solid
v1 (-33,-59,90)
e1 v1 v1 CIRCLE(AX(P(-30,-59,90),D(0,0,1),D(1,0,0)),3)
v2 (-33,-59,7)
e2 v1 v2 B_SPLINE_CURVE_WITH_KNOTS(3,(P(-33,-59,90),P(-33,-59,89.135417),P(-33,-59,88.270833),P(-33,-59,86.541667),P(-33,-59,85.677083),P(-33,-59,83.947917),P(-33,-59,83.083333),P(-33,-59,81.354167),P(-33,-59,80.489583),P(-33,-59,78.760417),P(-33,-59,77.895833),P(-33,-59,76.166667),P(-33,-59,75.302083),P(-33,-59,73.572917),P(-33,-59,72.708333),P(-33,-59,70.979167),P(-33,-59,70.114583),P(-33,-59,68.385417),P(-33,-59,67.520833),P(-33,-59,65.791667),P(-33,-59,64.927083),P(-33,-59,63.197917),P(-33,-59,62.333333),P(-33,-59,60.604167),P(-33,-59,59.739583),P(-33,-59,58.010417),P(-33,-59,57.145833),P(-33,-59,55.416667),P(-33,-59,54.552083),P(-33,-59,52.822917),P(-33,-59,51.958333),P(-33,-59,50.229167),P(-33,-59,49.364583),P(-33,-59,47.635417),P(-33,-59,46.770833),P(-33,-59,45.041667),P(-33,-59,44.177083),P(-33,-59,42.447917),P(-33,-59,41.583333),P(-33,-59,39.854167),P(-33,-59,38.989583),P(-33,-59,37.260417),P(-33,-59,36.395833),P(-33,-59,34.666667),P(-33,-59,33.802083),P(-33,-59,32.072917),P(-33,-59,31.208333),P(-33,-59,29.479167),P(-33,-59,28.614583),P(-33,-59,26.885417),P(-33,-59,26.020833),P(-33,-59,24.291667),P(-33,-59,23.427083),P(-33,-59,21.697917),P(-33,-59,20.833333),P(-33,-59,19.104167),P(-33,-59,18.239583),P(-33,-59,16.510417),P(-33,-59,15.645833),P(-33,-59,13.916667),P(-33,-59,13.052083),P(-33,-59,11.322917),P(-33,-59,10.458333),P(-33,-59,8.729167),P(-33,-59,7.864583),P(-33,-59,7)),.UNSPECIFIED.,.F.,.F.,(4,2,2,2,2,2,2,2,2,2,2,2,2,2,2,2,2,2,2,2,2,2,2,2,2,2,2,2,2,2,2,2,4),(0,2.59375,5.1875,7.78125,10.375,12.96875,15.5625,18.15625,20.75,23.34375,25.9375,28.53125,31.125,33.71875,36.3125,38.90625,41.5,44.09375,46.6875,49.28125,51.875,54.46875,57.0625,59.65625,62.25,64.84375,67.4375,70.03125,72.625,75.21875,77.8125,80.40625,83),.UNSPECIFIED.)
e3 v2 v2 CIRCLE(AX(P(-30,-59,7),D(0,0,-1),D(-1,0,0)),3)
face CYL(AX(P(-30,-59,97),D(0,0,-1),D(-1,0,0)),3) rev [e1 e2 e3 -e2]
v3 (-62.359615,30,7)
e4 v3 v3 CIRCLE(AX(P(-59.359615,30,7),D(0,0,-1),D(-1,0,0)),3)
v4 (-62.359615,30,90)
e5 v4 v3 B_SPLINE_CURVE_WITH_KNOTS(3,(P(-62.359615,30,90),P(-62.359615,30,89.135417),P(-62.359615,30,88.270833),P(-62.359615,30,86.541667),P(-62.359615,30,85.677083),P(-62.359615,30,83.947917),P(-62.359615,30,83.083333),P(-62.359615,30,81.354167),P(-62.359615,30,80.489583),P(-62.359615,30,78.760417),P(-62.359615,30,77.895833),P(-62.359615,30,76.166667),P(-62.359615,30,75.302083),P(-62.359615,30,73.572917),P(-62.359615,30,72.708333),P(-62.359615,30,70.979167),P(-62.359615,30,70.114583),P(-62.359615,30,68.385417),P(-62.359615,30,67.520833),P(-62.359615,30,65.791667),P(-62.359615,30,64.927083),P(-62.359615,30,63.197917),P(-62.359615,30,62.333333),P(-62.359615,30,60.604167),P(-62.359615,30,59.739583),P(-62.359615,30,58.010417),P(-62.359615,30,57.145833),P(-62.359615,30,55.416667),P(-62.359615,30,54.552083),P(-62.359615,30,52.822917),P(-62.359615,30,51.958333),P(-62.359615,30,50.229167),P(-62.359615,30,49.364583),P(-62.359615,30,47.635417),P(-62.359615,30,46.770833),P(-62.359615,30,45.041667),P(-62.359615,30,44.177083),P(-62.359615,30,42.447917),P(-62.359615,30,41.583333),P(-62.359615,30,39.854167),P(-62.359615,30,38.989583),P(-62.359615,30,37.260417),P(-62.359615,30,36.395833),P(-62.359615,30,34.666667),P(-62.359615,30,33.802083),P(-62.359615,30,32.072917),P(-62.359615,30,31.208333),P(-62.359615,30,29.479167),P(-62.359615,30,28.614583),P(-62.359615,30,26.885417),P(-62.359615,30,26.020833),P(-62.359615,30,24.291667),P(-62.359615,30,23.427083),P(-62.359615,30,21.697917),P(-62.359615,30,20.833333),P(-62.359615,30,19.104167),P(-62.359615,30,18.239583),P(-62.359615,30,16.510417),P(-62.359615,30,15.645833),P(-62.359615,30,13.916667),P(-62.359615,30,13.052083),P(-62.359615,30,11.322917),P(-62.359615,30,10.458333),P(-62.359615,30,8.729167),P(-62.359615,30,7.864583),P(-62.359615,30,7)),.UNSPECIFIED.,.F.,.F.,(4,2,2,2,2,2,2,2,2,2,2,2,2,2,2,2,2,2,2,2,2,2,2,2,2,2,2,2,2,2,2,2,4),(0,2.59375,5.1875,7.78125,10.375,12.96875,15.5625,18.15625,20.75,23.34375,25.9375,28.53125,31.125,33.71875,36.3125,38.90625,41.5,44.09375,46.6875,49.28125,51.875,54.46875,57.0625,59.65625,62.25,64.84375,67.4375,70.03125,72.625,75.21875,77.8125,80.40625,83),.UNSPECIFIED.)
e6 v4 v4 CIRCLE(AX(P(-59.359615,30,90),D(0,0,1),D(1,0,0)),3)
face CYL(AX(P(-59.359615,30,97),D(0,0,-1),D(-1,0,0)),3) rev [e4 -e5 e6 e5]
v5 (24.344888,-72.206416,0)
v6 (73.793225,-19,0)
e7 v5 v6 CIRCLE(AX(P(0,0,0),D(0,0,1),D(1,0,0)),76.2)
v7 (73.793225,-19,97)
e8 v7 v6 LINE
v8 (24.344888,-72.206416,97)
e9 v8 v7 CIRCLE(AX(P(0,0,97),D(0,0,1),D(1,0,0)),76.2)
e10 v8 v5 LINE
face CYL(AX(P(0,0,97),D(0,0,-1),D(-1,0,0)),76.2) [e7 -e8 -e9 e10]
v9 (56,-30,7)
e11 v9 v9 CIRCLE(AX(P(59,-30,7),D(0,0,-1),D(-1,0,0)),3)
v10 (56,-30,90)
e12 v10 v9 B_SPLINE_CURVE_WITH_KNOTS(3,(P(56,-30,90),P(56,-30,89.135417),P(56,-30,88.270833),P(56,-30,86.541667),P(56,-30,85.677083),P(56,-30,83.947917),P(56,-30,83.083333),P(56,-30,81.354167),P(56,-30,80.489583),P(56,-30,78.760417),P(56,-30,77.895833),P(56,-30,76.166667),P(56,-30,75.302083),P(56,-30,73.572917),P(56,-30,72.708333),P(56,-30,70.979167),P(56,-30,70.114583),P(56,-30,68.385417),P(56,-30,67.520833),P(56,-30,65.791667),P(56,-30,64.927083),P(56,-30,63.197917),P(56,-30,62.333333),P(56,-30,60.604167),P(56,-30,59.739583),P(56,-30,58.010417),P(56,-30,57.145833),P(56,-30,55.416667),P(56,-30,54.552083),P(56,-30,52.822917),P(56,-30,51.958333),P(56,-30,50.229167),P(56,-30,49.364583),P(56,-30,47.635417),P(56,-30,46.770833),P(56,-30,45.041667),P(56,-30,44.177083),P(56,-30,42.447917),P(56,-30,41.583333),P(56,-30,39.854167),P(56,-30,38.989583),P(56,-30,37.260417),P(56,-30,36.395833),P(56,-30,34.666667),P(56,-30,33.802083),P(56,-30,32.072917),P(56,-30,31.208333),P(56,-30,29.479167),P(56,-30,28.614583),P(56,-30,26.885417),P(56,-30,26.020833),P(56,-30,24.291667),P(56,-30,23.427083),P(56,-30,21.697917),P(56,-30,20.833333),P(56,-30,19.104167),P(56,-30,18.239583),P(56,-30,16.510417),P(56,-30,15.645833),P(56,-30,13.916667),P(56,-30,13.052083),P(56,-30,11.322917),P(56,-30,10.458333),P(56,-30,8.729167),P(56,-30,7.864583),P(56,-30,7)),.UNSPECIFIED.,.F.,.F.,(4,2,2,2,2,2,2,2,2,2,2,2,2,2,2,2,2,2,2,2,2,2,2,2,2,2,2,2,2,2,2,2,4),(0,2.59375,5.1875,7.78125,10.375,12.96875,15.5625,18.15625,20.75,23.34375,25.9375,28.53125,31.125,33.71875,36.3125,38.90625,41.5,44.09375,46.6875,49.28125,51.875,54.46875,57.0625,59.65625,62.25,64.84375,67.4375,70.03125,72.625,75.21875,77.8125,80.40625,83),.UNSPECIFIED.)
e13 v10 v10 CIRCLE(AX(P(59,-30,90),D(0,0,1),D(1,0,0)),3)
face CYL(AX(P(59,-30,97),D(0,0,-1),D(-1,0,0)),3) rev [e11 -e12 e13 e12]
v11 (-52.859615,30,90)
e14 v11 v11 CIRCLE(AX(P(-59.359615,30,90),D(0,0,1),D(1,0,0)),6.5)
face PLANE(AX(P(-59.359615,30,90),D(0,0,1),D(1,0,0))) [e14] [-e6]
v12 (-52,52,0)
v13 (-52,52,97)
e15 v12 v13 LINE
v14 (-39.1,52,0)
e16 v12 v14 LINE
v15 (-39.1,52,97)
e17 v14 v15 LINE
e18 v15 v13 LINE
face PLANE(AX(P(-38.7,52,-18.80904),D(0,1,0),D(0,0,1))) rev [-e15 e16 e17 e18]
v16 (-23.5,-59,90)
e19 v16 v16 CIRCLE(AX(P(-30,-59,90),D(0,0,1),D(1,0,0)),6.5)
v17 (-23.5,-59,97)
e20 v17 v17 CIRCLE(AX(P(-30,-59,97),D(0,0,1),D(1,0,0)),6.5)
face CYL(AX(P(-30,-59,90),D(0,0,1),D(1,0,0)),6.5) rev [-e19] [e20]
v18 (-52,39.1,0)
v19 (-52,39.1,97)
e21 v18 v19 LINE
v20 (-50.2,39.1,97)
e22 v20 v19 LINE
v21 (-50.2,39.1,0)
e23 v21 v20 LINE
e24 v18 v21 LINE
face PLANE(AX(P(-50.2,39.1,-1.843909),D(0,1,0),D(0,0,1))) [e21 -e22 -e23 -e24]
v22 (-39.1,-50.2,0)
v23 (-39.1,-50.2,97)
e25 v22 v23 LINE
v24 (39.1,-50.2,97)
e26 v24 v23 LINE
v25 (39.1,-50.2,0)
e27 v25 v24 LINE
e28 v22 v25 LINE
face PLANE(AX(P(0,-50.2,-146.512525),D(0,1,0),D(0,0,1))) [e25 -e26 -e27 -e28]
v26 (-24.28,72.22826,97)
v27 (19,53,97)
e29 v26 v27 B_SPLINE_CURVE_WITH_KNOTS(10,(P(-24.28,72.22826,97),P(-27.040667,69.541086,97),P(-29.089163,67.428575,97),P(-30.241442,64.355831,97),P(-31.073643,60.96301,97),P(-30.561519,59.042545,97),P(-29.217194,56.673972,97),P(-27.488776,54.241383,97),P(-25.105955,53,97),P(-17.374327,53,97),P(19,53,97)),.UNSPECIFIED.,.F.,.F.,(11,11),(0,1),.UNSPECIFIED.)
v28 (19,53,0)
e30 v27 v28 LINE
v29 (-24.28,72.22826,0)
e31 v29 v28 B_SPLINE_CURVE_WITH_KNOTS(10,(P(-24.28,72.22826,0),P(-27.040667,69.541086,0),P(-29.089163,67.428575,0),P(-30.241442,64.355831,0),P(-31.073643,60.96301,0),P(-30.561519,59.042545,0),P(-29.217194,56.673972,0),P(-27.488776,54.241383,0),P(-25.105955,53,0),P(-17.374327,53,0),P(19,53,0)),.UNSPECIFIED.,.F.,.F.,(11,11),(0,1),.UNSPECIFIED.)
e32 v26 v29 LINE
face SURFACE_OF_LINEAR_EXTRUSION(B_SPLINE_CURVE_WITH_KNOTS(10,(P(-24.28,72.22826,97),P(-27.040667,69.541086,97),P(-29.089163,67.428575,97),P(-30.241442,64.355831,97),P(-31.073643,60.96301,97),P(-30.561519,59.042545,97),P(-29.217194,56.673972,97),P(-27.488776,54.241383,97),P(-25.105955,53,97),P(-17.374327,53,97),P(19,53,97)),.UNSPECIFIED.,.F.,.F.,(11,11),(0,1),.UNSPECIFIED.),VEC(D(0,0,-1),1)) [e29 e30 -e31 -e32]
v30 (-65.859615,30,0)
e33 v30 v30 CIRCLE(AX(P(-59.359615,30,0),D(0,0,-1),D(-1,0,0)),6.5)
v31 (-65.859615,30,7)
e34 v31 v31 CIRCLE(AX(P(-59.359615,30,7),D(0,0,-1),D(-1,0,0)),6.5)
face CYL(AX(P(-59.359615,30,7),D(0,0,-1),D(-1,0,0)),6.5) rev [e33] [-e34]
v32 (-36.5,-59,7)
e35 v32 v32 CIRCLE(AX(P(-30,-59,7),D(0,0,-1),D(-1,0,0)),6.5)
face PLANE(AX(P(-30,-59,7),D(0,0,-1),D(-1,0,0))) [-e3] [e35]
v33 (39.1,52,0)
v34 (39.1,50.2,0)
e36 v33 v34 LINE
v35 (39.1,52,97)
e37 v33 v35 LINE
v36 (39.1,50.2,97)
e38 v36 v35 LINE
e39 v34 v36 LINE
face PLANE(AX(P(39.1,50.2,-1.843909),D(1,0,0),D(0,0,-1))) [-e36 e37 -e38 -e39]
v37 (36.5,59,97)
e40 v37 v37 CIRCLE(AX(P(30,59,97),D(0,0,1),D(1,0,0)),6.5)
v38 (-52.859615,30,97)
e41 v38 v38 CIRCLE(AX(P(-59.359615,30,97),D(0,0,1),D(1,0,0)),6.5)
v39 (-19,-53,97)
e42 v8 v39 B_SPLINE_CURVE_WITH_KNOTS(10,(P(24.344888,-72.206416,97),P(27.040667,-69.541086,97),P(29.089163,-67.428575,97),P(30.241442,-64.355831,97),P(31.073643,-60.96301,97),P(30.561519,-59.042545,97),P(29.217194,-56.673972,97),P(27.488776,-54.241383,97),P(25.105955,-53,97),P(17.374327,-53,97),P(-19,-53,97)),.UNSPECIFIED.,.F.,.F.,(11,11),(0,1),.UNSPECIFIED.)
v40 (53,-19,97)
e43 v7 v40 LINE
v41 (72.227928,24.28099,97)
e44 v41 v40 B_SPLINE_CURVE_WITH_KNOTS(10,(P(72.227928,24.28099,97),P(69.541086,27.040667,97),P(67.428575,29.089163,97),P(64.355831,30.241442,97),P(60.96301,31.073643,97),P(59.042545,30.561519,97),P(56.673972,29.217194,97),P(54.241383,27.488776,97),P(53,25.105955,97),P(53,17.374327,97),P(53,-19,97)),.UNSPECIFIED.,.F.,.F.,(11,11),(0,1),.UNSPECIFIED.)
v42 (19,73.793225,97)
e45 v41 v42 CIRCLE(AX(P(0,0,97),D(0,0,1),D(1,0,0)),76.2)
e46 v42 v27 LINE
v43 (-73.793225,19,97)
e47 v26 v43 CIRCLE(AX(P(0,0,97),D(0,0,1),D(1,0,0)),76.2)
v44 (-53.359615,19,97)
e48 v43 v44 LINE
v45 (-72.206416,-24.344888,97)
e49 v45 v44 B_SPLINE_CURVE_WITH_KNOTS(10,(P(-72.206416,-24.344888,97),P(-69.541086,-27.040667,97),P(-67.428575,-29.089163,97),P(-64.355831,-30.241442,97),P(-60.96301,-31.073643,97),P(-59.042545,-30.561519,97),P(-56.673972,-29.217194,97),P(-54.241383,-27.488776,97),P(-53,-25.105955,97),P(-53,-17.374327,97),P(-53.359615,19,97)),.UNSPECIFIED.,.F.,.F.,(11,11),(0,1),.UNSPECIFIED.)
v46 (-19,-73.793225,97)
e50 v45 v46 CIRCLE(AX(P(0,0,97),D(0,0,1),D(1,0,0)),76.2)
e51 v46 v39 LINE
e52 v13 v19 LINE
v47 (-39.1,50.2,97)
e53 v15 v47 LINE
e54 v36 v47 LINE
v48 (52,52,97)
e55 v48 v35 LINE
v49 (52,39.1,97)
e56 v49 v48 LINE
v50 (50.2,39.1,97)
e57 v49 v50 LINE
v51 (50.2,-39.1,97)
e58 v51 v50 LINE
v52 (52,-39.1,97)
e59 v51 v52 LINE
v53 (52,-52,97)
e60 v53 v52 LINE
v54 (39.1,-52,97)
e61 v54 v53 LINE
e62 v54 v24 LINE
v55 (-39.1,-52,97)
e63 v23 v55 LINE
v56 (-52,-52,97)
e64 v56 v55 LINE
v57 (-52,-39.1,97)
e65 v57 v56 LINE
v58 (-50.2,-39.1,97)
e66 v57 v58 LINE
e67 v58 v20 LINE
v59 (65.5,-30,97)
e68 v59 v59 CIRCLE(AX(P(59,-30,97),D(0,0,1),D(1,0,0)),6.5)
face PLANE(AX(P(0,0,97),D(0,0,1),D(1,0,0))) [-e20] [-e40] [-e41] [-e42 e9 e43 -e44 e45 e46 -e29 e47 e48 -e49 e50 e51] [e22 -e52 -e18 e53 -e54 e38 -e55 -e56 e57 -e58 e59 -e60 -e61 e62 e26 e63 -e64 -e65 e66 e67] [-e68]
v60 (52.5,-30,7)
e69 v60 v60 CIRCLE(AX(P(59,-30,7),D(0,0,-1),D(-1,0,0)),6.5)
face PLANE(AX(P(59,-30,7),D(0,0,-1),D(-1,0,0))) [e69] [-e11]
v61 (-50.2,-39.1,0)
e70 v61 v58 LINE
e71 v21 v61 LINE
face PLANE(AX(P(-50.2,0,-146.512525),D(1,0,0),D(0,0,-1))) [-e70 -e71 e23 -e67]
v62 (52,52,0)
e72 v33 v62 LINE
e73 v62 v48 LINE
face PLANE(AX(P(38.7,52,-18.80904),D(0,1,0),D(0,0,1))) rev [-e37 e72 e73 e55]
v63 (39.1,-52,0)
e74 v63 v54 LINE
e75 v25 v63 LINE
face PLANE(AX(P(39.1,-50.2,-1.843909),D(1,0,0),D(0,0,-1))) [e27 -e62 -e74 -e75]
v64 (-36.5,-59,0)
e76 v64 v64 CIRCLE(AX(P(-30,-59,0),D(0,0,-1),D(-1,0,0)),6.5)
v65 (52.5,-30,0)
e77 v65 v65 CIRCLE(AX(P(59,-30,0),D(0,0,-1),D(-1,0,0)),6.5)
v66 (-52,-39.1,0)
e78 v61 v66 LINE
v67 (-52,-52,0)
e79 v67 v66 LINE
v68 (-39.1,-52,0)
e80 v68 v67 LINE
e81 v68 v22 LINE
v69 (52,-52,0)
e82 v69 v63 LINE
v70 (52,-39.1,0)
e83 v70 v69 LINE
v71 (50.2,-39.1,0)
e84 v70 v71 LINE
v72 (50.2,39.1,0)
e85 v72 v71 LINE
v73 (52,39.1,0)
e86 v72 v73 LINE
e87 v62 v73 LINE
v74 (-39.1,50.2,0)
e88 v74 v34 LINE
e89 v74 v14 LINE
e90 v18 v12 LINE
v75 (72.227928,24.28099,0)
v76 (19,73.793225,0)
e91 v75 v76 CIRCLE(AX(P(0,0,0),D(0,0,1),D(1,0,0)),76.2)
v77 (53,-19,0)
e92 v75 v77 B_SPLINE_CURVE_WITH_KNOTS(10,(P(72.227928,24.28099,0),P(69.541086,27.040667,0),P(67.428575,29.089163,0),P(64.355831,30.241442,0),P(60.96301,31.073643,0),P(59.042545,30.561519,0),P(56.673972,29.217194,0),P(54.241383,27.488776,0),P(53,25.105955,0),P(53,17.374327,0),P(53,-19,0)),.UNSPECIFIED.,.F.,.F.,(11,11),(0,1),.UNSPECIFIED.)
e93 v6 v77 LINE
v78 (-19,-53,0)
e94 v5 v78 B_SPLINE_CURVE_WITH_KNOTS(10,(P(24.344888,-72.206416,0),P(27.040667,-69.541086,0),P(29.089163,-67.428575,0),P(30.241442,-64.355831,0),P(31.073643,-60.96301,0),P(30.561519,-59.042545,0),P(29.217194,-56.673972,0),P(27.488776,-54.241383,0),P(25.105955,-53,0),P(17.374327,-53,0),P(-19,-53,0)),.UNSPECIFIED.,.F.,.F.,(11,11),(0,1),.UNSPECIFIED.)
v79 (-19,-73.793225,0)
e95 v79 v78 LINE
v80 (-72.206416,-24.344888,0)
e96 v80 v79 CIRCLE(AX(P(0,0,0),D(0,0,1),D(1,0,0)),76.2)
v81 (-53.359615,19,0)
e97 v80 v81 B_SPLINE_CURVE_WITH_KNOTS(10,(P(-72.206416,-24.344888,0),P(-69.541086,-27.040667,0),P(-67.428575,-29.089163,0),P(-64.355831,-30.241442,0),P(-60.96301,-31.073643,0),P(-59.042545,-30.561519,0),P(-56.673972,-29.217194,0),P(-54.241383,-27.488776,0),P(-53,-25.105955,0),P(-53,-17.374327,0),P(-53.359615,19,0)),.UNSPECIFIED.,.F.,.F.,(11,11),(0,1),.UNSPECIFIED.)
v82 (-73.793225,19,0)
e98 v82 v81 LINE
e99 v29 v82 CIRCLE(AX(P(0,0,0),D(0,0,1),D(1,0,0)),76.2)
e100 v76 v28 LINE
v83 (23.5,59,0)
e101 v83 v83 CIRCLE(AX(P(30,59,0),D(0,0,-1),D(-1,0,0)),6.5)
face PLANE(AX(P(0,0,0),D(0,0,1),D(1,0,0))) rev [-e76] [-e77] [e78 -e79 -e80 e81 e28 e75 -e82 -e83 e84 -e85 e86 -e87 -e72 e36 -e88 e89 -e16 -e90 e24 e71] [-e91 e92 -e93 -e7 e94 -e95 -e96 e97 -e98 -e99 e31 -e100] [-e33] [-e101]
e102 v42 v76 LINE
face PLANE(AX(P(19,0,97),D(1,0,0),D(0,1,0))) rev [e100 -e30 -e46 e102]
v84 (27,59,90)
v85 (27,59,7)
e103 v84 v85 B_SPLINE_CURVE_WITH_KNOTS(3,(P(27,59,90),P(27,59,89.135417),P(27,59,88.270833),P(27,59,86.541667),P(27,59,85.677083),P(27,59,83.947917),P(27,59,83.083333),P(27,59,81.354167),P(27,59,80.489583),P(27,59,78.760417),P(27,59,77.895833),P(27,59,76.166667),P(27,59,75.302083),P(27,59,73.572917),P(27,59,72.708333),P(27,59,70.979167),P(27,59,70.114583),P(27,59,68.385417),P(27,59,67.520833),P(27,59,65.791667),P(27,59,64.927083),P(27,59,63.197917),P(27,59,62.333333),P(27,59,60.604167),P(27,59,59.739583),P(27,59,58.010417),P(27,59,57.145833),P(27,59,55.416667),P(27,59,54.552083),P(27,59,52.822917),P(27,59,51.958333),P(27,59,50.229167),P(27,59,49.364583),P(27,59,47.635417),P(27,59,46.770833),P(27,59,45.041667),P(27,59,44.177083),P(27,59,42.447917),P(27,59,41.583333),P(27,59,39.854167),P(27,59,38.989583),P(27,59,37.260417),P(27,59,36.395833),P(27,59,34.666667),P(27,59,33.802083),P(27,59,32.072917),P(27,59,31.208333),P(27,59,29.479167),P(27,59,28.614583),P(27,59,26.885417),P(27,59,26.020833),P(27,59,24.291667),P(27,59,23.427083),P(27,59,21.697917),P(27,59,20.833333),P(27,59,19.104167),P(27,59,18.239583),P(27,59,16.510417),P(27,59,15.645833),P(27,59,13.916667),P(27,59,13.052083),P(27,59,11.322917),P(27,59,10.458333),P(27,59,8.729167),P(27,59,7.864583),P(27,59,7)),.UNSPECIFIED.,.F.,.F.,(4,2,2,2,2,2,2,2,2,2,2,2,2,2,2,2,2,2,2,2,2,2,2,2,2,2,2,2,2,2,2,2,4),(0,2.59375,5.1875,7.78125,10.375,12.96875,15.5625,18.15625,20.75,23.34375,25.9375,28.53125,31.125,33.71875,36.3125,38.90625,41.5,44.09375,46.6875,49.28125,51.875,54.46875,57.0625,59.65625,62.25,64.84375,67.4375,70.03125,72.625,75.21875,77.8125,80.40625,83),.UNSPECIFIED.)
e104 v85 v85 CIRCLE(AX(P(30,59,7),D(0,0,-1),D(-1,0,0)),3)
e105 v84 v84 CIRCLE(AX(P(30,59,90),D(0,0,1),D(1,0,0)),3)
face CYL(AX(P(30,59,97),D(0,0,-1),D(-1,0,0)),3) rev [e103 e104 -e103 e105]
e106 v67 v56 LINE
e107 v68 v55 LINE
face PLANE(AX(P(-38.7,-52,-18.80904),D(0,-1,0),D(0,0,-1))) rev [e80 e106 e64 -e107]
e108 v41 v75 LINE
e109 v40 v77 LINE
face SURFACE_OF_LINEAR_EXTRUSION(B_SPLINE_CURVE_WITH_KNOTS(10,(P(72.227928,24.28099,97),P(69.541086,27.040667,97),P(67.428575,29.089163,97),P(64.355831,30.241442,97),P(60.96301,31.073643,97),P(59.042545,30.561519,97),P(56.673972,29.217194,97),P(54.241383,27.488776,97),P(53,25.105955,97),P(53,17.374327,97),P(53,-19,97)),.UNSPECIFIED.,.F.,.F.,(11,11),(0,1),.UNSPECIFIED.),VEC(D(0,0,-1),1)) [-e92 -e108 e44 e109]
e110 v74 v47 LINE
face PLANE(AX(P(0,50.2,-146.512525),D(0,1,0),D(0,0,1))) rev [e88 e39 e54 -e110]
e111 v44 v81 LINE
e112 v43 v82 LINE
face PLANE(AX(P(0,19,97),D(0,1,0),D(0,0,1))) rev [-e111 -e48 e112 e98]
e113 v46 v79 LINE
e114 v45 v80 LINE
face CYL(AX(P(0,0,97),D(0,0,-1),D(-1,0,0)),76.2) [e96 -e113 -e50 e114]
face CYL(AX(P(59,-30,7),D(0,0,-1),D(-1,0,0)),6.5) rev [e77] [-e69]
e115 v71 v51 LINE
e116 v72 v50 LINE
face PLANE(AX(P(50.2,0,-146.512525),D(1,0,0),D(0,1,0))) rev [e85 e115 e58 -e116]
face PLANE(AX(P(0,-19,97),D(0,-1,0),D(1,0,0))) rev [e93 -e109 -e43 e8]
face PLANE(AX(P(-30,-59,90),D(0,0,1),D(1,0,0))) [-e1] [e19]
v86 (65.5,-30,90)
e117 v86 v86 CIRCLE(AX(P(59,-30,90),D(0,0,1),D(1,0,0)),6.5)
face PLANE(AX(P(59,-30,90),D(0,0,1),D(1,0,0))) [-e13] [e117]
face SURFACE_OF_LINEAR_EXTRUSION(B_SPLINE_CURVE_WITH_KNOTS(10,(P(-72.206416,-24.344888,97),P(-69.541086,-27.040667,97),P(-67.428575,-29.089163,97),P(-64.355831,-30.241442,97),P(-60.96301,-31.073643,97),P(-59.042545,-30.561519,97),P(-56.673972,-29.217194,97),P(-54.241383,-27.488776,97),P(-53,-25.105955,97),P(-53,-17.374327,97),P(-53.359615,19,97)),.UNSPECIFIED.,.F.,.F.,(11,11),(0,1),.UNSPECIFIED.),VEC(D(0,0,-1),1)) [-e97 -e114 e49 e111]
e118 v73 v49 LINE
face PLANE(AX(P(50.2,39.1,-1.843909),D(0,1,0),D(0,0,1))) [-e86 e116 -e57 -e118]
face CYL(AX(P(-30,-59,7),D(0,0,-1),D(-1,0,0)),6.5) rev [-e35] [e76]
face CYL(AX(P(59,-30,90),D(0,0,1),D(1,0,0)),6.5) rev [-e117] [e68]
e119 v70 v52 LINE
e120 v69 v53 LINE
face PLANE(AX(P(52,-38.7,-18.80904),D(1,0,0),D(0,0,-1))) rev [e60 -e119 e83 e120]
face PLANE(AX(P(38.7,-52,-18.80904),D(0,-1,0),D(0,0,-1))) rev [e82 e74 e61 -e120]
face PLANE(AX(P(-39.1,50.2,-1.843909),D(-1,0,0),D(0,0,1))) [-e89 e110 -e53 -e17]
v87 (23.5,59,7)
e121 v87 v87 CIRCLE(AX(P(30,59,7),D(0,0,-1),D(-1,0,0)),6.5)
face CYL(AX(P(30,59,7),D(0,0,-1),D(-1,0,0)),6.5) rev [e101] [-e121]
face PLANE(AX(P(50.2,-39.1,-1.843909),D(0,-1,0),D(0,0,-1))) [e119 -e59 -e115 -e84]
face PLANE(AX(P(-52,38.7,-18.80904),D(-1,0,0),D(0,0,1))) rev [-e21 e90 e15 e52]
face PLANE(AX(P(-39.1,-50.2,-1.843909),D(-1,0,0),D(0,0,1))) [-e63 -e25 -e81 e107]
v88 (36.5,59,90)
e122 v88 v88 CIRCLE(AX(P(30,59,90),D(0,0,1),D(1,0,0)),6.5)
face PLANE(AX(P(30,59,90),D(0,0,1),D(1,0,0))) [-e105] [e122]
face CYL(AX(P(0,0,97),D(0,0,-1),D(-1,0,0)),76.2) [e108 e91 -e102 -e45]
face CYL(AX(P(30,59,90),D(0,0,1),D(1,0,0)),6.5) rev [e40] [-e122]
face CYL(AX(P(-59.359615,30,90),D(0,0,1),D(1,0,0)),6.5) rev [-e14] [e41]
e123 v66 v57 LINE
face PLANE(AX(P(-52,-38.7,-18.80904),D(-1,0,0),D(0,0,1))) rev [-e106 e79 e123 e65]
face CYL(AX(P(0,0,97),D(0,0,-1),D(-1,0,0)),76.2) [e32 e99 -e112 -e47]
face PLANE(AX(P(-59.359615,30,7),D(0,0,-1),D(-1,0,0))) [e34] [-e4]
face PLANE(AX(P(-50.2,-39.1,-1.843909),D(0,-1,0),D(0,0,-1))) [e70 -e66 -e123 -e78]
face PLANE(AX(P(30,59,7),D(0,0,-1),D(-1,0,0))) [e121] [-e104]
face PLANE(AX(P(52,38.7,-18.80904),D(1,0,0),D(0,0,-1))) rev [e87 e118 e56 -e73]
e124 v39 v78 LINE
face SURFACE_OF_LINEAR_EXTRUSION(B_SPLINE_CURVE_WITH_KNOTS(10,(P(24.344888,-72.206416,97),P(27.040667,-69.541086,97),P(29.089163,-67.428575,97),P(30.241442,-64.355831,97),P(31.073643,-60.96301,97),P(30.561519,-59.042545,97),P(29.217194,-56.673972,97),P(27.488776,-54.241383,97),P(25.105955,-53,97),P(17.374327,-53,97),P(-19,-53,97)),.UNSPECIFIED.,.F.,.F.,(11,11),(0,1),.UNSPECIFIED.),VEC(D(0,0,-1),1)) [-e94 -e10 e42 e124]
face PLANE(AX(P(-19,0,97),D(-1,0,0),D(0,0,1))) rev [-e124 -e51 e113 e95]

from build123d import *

# Parameters (mm, degrees)
BOSS_EXTRUDE3_OUTLINE_R = 3
BOSS_EXTRUDE3_DEPTH     = 97
SKETCH3_R               = 3
BOSS_EXTRUDE4_DEPTH     = 5
SKETCH3_3_R             = 6.5
CUT_EXTRUDE1_DEPTH      = 7
BOSS_EXTRUDE5_OUTLINE_R = 3
BOSS_EXTRUDE5_DEPTH     = 6
CUT_EXTRUDE2_DEPTH      = 6
SKETCH6_R               = 6.5
CUT_EXTRUDE5_DEPTH      = 7
CUT_EXTRUDE6_DEPTH      = 97
CUT_EXTRUDE9_DEPTH      = 97
SKETCH9_W               = 0.4
SKETCH9_H               = 1.8
SKETCH9_W_2             = 1.8
SKETCH9_H_2             = 0.4
BOSS_EXTRUDE6_DEPTH     = 97


# Read off the part's stored shape, not the designer's step: Boss-Extrude3, Boss-Extrude5, Cut-Extrude2
with BuildPart() as part:
    # Boss-Extrude3 outline → Boss-Extrude3 (new body)
    with BuildSketch(Plane.XY):
        with BuildLine():
            ThreePointArc((-24.28, 72.228260397), (-55.793380191, 51.899313356), (-73.793224621, 19))
            Line((-73.793224621, 19), (-53.359615493, 19))
            add(Edge.make_bspline(
                [(-72.206415586, -24.344887517), (-69.541086329, -27.040667073), (-67.428574969, -29.089162938), (-64.355831171, -30.241441862), (-60.963009895, -31.073643307), (-59.042545022, -30.561519341), (-56.673971678, -29.217193929), (-54.241382838, -27.488775543), (-53, -25.105954954), (-53, -17.37432721), (-53.359615493, 19)],
                knots=[0, 0, 0, 0, 0, 0, 0, 0, 0, 0, 0, 1, 1, 1, 1, 1, 1, 1, 1, 1, 1, 1], degree=10))
            ThreePointArc((-72.206415586, -24.344887517), (-51.874242853, -55.816690411), (-19, -73.793224621))
            Line((-19, -73.793224621), (-19, -53))
            add(Edge.make_bspline(
                [(24.344887517, -72.206415586), (27.040667073, -69.541086329), (29.089162938, -67.428574969), (30.241441862, -64.355831171), (31.073643307, -60.963009895), (30.561519341, -59.042545022), (29.217193929, -56.673971678), (27.488775543, -54.241382838), (25.105954954, -53), (17.37432721, -53), (-19, -53)],
                knots=[0, 0, 0, 0, 0, 0, 0, 0, 0, 0, 0, 1, 1, 1, 1, 1, 1, 1, 1, 1, 1, 1], degree=10))
            ThreePointArc((24.344887517, -72.206415586), (55.816690411, -51.874242853), (73.793224621, -19))
            Line((73.793224621, -19), (53, -19))
            add(Edge.make_bspline(
                [(72.227927536, 24.280990174), (69.541086329, 27.040667073), (67.428574969, 29.089162938), (64.355831171, 30.241441862), (60.963009895, 31.073643307), (59.042545022, 30.561519341), (56.673971678, 29.217193929), (54.241382838, 27.488775543), (53, 25.105954954), (53, 17.37432721), (53, -19)],
                knots=[0, 0, 0, 0, 0, 0, 0, 0, 0, 0, 0, 1, 1, 1, 1, 1, 1, 1, 1, 1, 1, 1], degree=10))
            ThreePointArc((72.227927536, 24.280990174), (51.89893092, 55.793735933), (19, 73.793224621))
            Line((19, 73.793224621), (19, 53))
            add(Edge.make_bspline(
                [(-24.28, 72.228260397), (-27.040667073, 69.541086329), (-29.089162938, 67.428574969), (-30.241441862, 64.355831171), (-31.073643307, 60.963009895), (-30.561519341, 59.042545022), (-29.217193929, 56.673971678), (-27.488775543, 54.241382838), (-25.105954954, 53), (-17.37432721, 53), (19, 53)],
                knots=[0, 0, 0, 0, 0, 0, 0, 0, 0, 0, 0, 1, 1, 1, 1, 1, 1, 1, 1, 1, 1, 1], degree=10))
        make_face()
        with Locations((-30, -59)):
            Circle(BOSS_EXTRUDE3_OUTLINE_R, mode=Mode.SUBTRACT)
        Polygon((-38.9, -51.6), (-51.6, -51.6), (-51.6, -38.9), (-50, -38.9), (-50, 38.9), (-51.6, 38.9), (-51.6, 51.6), (-38.9, 51.6), (-38.9, 50), (38.9, 50), (38.9, 51.6), (51.6, 51.6), (51.6, 38.9), (50, 38.9), (50, -38.9), (51.6, -38.9), (51.6, -51.6), (38.9, -51.6), (38.9, -50), (-38.9, -50), align=None, mode=Mode.SUBTRACT)
        with Locations((59, -30)):
            Circle(BOSS_EXTRUDE3_OUTLINE_R, mode=Mode.SUBTRACT)
        with Locations((-59.359615493, 30)):
            Circle(BOSS_EXTRUDE3_OUTLINE_R, mode=Mode.SUBTRACT)
        with Locations((30, 59)):
            Circle(BOSS_EXTRUDE3_OUTLINE_R, mode=Mode.SUBTRACT)
    extrude(amount=BOSS_EXTRUDE3_DEPTH)

    # Sketch3 → Boss-Extrude4 (add)
    with BuildSketch(Plane.XY.offset(97)):
        with Locations(Location((-59.359615493, 30, 0), (0, 0, 180))):
            Circle(SKETCH3_R)
    extrude(amount=BOSS_EXTRUDE4_DEPTH)


with BuildPart() as boss_extrude4_kept_piece:
    # of the separate pieces the step leaves, the one the design keeps (boss_extrude4_pieces_kept)
    add(part.part.solids().sort_by_distance((-24.28, 72.228260397, 0))[0])

    # Sketch3<3> → Cut-Extrude1 (cut)
    with BuildSketch(Plane.XY.offset(97)):
        with Locations((-59.359615493, 30)):
            Circle(SKETCH3_3_R)
        with Locations((30, 59)):
            Circle(SKETCH3_3_R)
        with Locations((59, -30)):
            Circle(SKETCH3_3_R)
        with Locations((-30, -59)):
            Circle(SKETCH3_3_R)
    extrude(amount=-CUT_EXTRUDE1_DEPTH, mode=Mode.SUBTRACT)

    # Boss-Extrude5 outline → Boss-Extrude5 (add)
    with BuildSketch(Plane.XY):
        with Locations((-59.359615493, 30)):
            Circle(BOSS_EXTRUDE5_OUTLINE_R)
    extrude(amount=BOSS_EXTRUDE5_DEPTH)

    # Cut-Extrude2 outline → Cut-Extrude2 (cut)
    with BuildSketch(Plane.XY):
        Polygon((-32.75, -54.236860279), (-35.5, -59), (-32.75, -63.763139721), (-27.25, -63.763139721), (-24.5, -59), (-27.25, -54.236860279), align=None)
        Polygon((59, -24.5), (54.236860279, -27.25), (54.236860279, -32.75), (59, -35.5), (63.763139721, -32.75), (63.763139721, -27.25), align=None)
        Polygon((-59.359615493, 35.5), (-64.122755214, 32.75), (-64.122755214, 27.25), (-59.359615493, 24.5), (-54.596475772, 27.25), (-54.596475772, 32.75), align=None)
        Polygon((32.75, 63.763139721), (27.25, 63.763139721), (24.5, 59), (27.25, 54.236860279), (32.75, 54.236860279), (35.5, 59), align=None)
    extrude(amount=CUT_EXTRUDE2_DEPTH, mode=Mode.SUBTRACT)

    # Sketch6 → Cut-Extrude5 (cut)
    with BuildSketch(Plane(origin=(0, 0, 0), x_dir=(-1, 0, 0), z_dir=(0, 0, -1))):
        with Locations(Location((-30, 59, 0), (0, 0, 180))):
            Circle(SKETCH6_R)
        with Locations(Location((59.359615493, 30, 0), (0, 0, 180))):
            Circle(SKETCH6_R)
        with Locations(Location((30, -59, 0), (0, 0, 180))):
            Circle(SKETCH6_R)
        with Locations(Location((-59, -30, 0), (0, 0, 180))):
            Circle(SKETCH6_R)
    extrude(amount=-CUT_EXTRUDE5_DEPTH, mode=Mode.SUBTRACT)

    # Sketch7 → Cut-Extrude6 (cut)
    with BuildSketch(Plane.XY.offset(97)):
        Polygon((-38.7, -51.8), (-51.8, -51.8), (-51.8, -38.7), (-50.2, -38.7), (-50.2, 38.7), (-51.8, 38.7), (-51.8, 51.8), (-38.7, 51.8), (-38.7, 50.2), (38.7, 50.2), (38.7, 51.8), (51.8, 51.8), (51.8, 38.7), (50.2, 38.7), (50.2, -38.7), (51.8, -38.7), (51.8, -51.8), (38.7, -51.8), (38.7, -50.2), (-38.7, -50.2), align=None)
        Polygon((-38.9, -51.6), (-51.6, -51.6), (-51.6, -38.9), (-50, -38.9), (-50, 38.9), (-51.6, 38.9), (-51.6, 51.6), (-38.9, 51.6), (-38.9, 50), (38.9, 50), (38.9, 51.6), (51.6, 51.6), (51.6, 38.9), (50, 38.9), (50, -38.9), (51.6, -38.9), (51.6, -51.6), (38.9, -51.6), (38.9, -50), (-38.9, -50), align=None, mode=Mode.SUBTRACT)
    extrude(amount=-CUT_EXTRUDE6_DEPTH, mode=Mode.SUBTRACT)

    # Sketch8 → Cut-Extrude9 (cut)
    with BuildSketch(Plane.XY.offset(97)):
        Polygon((-51.8, 38.7), (-51.8, 51.8), (-38.7, 51.8), (-38.7, 52), (-52, 52), (-52, 38.7), align=None)
        Polygon((-51.8, -38.7), (-51.8, -51.8), (-38.7, -51.8), (-38.7, -52), (-52, -52), (-52, -38.7), align=None)
        Polygon((51.8, -38.7), (51.8, -51.8), (38.7, -51.8), (38.7, -52), (52, -52), (52, -38.7), align=None)
        Polygon((51.8, 38.7), (51.8, 51.8), (38.7, 51.8), (38.7, 52), (52, 52), (52, 38.7), align=None)
    extrude(amount=-CUT_EXTRUDE9_DEPTH, mode=Mode.SUBTRACT)

    # Sketch9 → Boss-Extrude6 (add)
    with BuildSketch(Plane.XY.offset(97)):
        with Locations((-38.9, 51.1)):
            Rectangle(SKETCH9_W, SKETCH9_H)
        with Locations((-51.1, 38.9)):
            Rectangle(SKETCH9_W_2, SKETCH9_H_2)
        with Locations((38.9, 51.1)):
            Rectangle(SKETCH9_W, SKETCH9_H)
        with Locations((51.1, 38.9)):
            Rectangle(SKETCH9_W_2, SKETCH9_H_2)
        with Locations((51.1, -38.9)):
            Rectangle(SKETCH9_W_2, SKETCH9_H_2)
        with Locations((38.9, -51.1)):
            Rectangle(SKETCH9_W, SKETCH9_H)
        with Locations((-51.1, -38.9)):
            Rectangle(SKETCH9_W_2, SKETCH9_H_2)
        with Locations((-38.9, -51.1)):
            Rectangle(SKETCH9_W, SKETCH9_H)
    extrude(amount=-BOSS_EXTRUDE6_DEPTH)


solid = boss_extrude4_kept_piece.part
